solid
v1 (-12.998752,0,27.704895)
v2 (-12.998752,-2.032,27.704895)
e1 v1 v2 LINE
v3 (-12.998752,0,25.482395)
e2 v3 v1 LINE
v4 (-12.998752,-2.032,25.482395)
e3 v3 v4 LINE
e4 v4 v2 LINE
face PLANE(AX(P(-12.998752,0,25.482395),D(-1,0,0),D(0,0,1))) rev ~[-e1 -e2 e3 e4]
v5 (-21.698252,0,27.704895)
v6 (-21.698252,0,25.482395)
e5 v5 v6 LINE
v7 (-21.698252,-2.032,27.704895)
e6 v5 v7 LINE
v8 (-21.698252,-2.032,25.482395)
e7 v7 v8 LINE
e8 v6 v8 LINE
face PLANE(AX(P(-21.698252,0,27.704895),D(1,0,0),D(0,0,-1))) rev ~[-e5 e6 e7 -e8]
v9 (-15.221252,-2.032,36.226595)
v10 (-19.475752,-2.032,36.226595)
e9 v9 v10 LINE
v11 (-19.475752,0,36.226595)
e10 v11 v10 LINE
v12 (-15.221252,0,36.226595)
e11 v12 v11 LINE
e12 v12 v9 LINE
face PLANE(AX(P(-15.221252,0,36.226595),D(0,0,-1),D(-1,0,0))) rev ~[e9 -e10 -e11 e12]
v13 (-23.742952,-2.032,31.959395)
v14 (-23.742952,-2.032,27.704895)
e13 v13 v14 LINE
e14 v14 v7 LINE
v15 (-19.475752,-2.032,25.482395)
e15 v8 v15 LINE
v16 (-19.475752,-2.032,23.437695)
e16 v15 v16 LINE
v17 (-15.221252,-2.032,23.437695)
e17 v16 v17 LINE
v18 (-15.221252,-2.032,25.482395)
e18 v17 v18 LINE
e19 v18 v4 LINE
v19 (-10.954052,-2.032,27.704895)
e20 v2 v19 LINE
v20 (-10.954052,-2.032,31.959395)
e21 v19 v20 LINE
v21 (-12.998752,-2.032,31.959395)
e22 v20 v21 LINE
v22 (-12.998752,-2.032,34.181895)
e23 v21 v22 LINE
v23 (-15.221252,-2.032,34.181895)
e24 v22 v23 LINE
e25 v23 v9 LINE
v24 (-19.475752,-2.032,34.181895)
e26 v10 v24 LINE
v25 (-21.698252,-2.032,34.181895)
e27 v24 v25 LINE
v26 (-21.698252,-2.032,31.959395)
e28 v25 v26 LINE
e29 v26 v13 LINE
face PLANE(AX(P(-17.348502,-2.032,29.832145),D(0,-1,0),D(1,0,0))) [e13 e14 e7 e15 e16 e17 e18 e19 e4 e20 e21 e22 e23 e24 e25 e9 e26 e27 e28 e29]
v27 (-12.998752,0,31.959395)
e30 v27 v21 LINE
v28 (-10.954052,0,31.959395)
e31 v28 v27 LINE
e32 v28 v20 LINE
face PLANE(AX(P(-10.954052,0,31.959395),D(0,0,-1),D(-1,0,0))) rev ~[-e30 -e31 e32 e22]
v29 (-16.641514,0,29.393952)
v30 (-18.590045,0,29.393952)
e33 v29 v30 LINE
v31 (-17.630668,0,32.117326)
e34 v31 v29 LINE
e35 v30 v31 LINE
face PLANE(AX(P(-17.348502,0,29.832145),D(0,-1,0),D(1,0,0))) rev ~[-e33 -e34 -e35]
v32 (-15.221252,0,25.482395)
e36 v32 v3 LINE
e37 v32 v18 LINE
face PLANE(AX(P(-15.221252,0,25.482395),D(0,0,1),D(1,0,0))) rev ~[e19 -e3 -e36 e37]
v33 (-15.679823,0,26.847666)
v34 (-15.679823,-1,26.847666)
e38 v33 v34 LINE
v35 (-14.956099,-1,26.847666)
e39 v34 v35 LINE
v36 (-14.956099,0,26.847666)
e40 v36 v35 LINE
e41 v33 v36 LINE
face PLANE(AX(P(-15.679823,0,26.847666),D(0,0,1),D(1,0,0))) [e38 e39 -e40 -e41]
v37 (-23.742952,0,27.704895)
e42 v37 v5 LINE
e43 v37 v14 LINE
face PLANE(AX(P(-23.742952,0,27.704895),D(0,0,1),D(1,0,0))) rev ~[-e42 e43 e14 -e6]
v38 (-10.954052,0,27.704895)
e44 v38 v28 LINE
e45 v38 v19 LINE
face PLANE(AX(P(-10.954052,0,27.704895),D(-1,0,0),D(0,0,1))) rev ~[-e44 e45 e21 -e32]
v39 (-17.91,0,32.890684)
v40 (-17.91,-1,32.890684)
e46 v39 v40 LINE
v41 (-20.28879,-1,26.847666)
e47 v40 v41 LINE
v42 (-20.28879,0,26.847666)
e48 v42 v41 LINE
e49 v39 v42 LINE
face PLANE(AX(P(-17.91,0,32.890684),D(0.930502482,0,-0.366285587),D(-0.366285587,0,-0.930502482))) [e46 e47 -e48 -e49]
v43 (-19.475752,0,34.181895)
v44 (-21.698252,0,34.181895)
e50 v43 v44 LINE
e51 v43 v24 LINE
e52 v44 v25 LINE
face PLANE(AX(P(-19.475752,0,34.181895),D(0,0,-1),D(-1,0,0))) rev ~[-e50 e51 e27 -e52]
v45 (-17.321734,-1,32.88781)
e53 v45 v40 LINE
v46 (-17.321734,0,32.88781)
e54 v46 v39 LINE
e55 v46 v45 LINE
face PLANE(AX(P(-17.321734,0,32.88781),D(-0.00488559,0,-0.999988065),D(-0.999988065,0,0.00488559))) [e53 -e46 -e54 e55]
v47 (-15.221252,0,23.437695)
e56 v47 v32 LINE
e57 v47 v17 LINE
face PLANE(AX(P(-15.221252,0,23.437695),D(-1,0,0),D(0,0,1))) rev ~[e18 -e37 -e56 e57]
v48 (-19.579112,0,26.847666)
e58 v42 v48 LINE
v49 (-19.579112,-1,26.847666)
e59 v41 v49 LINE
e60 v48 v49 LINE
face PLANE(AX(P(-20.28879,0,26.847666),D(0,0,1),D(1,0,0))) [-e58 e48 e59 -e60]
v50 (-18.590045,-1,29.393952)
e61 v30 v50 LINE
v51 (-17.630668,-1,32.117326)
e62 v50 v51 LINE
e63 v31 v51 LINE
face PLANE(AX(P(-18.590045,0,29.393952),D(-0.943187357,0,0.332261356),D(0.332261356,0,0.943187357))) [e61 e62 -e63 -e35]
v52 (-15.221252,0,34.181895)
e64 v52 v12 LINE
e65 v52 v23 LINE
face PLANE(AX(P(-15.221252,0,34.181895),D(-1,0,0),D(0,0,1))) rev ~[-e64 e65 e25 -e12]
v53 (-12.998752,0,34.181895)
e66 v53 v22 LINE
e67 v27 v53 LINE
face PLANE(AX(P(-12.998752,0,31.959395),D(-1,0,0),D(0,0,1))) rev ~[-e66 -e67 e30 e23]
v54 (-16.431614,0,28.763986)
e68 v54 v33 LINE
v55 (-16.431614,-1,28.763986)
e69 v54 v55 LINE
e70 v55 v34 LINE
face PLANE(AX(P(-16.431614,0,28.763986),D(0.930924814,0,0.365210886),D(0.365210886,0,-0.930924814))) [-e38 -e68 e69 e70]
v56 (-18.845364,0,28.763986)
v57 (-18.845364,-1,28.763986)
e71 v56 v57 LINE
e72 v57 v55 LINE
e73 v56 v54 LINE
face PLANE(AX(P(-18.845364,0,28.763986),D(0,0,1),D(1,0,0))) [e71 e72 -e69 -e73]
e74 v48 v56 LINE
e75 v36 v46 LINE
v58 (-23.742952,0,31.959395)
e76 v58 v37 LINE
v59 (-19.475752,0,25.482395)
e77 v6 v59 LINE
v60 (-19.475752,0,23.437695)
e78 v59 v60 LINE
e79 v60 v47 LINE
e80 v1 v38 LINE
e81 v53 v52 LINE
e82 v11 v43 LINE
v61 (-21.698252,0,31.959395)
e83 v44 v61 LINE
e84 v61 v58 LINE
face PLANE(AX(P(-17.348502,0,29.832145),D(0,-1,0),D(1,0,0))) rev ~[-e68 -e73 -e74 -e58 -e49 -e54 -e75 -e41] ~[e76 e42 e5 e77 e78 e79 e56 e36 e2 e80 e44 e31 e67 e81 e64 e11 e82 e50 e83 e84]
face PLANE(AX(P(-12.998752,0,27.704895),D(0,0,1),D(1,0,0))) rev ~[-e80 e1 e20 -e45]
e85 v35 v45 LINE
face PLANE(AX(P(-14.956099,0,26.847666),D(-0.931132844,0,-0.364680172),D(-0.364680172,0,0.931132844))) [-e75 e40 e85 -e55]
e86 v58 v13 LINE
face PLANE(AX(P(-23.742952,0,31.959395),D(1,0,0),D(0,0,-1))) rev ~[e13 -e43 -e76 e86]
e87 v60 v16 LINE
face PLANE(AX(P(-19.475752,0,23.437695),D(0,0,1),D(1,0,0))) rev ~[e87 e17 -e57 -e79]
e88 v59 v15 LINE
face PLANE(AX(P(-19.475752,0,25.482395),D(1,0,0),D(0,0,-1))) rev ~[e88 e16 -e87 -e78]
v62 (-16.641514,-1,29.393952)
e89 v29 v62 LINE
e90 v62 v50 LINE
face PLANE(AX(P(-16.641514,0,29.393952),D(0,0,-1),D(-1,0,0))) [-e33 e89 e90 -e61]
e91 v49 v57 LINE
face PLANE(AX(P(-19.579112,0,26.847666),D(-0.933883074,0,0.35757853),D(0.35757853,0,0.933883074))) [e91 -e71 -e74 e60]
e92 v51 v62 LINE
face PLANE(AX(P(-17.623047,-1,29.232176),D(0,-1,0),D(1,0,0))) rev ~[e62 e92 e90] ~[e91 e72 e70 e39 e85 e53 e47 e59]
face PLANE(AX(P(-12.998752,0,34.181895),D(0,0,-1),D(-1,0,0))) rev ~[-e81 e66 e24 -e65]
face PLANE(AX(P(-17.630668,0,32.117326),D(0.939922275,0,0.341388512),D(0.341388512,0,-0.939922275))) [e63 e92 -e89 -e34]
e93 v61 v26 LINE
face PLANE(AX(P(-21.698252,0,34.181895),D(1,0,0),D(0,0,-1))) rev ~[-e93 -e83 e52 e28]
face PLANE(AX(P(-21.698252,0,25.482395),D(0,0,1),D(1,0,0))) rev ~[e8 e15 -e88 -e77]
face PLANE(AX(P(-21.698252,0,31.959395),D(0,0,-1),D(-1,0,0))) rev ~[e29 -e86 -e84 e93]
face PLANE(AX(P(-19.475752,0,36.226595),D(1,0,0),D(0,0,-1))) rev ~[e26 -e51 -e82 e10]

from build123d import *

# Parameters (mm, degrees)
F1_DEPTH = 2.032
F2_DEPTH = 1


# Not quite as in the source:
# - a feature names something its author has since deleted; it is built from what else it names


with BuildPart() as f1:
    # F0 (on Front) → F1 (new body)
    with BuildSketch(Plane.XZ):
        Polygon((-15.2212520439, 36.2265945869), (-17.3485020439, 36.2265945869), (-19.4757520439, 36.2265945869), (-19.4757520439, 34.1818945869), (-21.6982520439, 34.1818945869), (-21.6982520439, 31.9593945869), (-23.7429520439, 31.9593945869), (-23.7429520439, 29.8321445869), (-23.7429520439, 27.7048945869), (-21.6982520439, 27.7048945869), (-21.6982520439, 25.4823945869), (-19.4757520439, 25.4823945869), (-19.4757520439, 23.4376945869), (-17.3485020439, 23.4376945869), (-15.2212520439, 23.4376945869), (-15.2212520439, 25.4823945869), (-12.9987520439, 25.4823945869), (-12.9987520439, 27.7048945869), (-10.9540520439, 27.7048945869), (-10.9540520439, 29.8321445869), (-10.9540520439, 31.9593945869), (-12.9987520439, 31.9593945869), (-12.9987520439, 34.1818945869), (-15.2212520439, 34.1818945869), align=None)
        Polygon((-20.2887904064, 26.8476658233), (-17.9100000431, 32.8906836652), (-17.3217338641, 32.8878096037), (-14.9560986218, 26.8476658233), (-15.6798228753, 26.8476658233), (-16.4316139315, 28.7639858865), (-18.8453636264, 28.7639858865), (-19.5791117047, 26.8476658233), align=None, mode=Mode.SUBTRACT)
        Polygon((-17.3217338641, 32.8878096037), (-17.9100000431, 32.8906836652), (-20.2887904064, 26.8476658233), (-19.5791117047, 26.8476658233), (-18.8453636264, 28.7639858865), (-16.4316139315, 28.7639858865), (-15.6798228753, 26.8476658233), (-14.9560986218, 26.8476658233), align=None)
        Polygon((-18.5900452678, 29.3939520338), (-17.6306684633, 32.1173264378), (-16.6415135508, 29.3939520338), align=None, mode=Mode.SUBTRACT)
        Polygon((-16.6415135508, 29.3939520338), (-17.6306684633, 32.1173264378), (-18.5900452678, 29.3939520338), align=None)
    extrude(amount=F1_DEPTH)

    # F0 (on Front) → F2 (cut)
    with BuildSketch(Plane.XZ):
        Polygon((-17.3217338641, 32.8878096037), (-17.9100000431, 32.8906836652), (-20.2887904064, 26.8476658233), (-19.5791117047, 26.8476658233), (-18.8453636264, 28.7639858865), (-16.4316139315, 28.7639858865), (-15.6798228753, 26.8476658233), (-14.9560986218, 26.8476658233), align=None)
        Polygon((-18.5900452678, 29.3939520338), (-17.6306684633, 32.1173264378), (-16.6415135508, 29.3939520338), align=None, mode=Mode.SUBTRACT)
    extrude(amount=F2_DEPTH, mode=Mode.SUBTRACT)


solid = f1.part
